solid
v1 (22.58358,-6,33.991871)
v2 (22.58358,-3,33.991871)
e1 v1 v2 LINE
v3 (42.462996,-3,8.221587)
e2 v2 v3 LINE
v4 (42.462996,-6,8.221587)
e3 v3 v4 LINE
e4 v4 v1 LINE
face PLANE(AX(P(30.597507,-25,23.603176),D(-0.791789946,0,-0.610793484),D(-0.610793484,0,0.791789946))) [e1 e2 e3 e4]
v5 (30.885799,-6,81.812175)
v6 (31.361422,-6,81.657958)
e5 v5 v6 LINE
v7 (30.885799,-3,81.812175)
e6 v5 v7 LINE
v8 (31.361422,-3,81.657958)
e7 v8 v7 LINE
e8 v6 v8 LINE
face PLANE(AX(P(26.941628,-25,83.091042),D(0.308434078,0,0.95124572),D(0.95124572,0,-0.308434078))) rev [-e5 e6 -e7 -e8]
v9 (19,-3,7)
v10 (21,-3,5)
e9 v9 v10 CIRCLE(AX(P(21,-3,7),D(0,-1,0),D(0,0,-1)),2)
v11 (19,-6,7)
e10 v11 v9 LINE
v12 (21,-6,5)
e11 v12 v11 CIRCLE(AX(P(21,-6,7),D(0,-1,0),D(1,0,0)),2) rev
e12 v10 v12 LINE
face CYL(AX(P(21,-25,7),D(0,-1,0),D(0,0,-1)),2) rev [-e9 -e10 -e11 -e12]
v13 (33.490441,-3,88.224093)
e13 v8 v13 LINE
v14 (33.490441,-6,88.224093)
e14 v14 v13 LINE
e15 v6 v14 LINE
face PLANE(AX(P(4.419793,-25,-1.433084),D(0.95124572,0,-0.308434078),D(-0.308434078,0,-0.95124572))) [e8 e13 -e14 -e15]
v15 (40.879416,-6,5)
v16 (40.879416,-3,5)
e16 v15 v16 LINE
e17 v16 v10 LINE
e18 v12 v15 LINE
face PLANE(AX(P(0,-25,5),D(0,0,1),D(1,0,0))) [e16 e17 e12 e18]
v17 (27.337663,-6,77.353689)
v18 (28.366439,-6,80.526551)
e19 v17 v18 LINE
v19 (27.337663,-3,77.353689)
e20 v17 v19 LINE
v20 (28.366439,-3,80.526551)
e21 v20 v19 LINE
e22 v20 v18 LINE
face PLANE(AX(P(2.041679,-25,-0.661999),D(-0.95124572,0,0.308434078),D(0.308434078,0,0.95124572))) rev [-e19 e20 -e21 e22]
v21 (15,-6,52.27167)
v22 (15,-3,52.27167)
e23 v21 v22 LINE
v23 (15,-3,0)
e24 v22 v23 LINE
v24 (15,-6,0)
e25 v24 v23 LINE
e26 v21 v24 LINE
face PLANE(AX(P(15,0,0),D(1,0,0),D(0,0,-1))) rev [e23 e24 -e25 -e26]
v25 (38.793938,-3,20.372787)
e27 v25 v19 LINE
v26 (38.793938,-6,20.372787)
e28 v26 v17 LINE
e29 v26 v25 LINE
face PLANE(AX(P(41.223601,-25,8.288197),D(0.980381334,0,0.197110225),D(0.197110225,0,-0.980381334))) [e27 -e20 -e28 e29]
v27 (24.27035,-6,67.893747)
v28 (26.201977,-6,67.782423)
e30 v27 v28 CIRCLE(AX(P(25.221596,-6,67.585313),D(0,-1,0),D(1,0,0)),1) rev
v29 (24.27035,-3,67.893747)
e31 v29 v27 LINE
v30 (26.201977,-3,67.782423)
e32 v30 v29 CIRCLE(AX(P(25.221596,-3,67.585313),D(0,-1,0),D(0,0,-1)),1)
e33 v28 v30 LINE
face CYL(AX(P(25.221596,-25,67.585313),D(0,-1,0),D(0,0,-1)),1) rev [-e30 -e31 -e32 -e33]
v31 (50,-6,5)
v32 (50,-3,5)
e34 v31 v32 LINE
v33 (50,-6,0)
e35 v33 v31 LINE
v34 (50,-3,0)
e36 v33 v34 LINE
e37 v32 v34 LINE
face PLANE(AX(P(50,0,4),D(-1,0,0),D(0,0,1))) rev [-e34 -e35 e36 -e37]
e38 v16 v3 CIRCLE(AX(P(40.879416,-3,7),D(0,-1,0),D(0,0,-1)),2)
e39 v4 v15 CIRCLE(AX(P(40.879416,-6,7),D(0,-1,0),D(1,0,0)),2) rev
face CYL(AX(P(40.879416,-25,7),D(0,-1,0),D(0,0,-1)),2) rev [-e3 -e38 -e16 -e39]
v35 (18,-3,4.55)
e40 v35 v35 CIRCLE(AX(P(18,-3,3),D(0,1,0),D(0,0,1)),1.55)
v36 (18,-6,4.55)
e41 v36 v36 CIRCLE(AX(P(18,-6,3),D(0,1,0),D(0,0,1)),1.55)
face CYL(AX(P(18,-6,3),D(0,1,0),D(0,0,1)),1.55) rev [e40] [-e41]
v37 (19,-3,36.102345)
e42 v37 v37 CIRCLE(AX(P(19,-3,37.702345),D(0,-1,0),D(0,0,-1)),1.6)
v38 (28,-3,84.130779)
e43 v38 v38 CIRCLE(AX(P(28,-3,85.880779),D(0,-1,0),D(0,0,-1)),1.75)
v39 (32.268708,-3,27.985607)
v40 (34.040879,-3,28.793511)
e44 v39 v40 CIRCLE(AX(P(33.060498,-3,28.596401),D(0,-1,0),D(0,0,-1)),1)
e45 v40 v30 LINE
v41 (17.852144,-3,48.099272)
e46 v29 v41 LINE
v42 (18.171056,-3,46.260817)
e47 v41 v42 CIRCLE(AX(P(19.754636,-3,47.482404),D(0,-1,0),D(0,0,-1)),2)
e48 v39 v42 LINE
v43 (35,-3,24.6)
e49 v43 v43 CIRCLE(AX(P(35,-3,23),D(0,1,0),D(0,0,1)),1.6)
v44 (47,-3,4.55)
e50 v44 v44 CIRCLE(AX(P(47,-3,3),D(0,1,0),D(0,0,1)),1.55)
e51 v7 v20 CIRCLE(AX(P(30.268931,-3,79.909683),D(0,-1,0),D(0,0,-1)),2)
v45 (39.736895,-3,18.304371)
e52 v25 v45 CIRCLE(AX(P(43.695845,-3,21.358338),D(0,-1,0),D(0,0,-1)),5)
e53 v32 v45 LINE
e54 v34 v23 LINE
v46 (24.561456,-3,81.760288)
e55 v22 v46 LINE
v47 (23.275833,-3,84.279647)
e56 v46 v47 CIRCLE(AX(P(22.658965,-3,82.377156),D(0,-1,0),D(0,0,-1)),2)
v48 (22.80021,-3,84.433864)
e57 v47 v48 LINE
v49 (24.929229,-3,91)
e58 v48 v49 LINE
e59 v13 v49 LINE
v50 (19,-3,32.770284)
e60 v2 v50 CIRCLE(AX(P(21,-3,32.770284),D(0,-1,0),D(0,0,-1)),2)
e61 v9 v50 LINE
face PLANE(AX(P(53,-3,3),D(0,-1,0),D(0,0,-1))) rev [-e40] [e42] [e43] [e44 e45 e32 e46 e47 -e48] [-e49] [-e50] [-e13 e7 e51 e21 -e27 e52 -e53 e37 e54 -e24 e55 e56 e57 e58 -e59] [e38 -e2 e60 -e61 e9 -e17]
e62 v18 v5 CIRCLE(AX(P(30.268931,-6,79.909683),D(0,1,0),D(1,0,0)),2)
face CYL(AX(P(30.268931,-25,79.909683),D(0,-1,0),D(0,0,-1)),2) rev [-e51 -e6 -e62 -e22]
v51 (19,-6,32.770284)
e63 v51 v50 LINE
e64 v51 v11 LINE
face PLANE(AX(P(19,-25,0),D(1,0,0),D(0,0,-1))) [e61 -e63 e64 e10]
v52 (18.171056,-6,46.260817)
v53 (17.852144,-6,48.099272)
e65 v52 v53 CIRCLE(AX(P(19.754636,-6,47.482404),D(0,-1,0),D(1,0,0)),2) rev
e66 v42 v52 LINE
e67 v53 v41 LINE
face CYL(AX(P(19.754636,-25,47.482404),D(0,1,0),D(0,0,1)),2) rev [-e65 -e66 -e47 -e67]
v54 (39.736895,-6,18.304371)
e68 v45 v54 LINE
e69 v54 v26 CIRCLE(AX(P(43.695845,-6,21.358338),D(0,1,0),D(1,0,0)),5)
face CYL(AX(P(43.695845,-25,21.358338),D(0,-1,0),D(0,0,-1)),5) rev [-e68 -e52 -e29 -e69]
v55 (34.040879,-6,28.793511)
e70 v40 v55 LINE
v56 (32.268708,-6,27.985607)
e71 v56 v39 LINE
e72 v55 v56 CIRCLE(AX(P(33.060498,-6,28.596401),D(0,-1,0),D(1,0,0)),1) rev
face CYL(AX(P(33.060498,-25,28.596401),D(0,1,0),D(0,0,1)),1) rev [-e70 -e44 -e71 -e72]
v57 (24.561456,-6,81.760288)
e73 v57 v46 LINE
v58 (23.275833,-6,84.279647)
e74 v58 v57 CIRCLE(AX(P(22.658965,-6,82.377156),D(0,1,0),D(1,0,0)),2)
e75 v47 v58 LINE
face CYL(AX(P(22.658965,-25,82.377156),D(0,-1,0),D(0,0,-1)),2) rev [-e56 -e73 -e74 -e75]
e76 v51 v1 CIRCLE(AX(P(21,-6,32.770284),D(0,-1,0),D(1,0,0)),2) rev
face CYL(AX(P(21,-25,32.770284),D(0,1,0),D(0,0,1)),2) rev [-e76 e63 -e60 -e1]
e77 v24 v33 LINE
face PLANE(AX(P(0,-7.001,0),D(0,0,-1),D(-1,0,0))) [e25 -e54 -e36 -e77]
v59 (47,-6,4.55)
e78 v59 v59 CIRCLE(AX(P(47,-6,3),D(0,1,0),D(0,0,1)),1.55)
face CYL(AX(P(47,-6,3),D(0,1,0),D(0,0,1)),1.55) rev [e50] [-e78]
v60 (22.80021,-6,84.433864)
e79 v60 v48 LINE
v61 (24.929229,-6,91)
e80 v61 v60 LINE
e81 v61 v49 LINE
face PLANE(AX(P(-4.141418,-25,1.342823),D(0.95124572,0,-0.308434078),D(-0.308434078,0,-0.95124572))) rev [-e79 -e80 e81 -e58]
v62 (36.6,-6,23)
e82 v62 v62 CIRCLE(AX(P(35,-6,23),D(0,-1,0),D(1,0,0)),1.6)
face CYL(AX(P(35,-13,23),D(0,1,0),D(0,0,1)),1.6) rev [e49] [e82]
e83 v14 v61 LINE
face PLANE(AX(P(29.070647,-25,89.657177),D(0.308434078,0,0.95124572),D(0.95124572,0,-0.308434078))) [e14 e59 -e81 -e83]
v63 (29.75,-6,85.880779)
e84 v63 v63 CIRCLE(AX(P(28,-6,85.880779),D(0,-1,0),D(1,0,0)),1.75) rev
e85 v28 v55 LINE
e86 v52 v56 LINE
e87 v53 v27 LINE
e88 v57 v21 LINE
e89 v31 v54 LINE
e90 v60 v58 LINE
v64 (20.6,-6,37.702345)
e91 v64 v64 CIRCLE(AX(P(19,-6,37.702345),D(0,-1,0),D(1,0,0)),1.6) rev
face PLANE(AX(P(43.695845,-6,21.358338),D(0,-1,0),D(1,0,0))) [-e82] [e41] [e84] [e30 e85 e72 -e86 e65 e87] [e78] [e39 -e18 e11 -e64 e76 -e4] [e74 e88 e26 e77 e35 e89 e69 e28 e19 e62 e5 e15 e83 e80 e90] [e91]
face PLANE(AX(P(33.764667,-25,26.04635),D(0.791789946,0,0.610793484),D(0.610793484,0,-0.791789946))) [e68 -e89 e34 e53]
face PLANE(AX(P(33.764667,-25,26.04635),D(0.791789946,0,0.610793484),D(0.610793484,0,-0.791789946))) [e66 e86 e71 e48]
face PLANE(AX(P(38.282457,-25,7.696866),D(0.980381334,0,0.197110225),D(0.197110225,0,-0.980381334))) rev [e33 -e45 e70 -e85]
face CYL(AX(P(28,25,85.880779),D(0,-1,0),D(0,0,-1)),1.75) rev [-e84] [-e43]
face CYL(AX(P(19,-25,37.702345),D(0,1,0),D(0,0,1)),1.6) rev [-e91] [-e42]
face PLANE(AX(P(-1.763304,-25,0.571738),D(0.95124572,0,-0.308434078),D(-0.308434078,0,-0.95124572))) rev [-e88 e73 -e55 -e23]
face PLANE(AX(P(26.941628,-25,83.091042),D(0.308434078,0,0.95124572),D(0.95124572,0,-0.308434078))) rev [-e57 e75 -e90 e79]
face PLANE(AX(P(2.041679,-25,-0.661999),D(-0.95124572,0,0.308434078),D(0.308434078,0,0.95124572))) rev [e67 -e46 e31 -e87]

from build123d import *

# Parameters (mm, degrees)
EXTRUDE_1_DEPTH      = 4
EXTRUDE_1_DEPTH_BACK = 3
SKETCH_1_W           = 100
SKETCH_1_H           = 14
SKETCH_1_R           = 1.75
SKETCH_2_W           = 88
SKETCH_2_H           = 14
EXTRUDE_2_DEPTH      = 3
SKETCH_10_W          = 88
SKETCH_10_H          = 4
EXTRUDE_5_DEPTH      = 35
SKETCH_11_R          = 1.6
CUT_EXTRUDE_3_DEPTH  = 25
SKETCH_19_W          = 65
SKETCH_19_H          = 14
CUT_EXTRUDE_7_DEPTH  = 10
SKETCH_21_R          = 1.75
CUT_EXTRUDE_9_DEPTH  = 25
FILLET_3_R           = 2
FILLET_4_R           = 1
FILLET_5_R           = 5
CUT_EXTRUDE_14_REACH = 106.771
SKETCH_27_W          = 35
SKETCH_27_H          = 3
SKETCH_28_W          = 56.249176637
SKETCH_28_H          = 109.102130605
CUT_EXTRUDE_15_DEPTH = 10
CUT_EXTRUDE_16_DEPTH = 1
SKETCH_34_R          = 1.55
CUT_EXTRUDE_17_DEPTH = 104.874924789
SKETCH_35_R          = 1.6
CUT_EXTRUDE_18_DEPTH = 10


with BuildPart() as part:
    # 草图1 → 凸台-拉伸1 (new, two sides: drawn at the far end of the back side and taken through both)
    # profile 1 of 3: a face of its own
    with BuildSketch(Plane.XY.offset(-EXTRUDE_1_DEPTH_BACK)):
        Rectangle(SKETCH_1_W, SKETCH_1_H)
        with Locations((26.315, 2.5)):
            Circle(SKETCH_1_R, mode=Mode.SUBTRACT)
        with Locations((26.315, -2.5)):
            Circle(SKETCH_1_R, mode=Mode.SUBTRACT)
        with Locations((-26.315, -2.5)):
            Circle(SKETCH_1_R, mode=Mode.SUBTRACT)
        with Locations((-26.315, 2.5)):
            Circle(SKETCH_1_R, mode=Mode.SUBTRACT)
    # profile 2 of 3: a face of its own
    with BuildSketch(Plane.XY.offset(-EXTRUDE_1_DEPTH_BACK)):
        with Locations((-26.315, -2.5)):
            Circle(SKETCH_1_R)
    # profile 3 of 3: a face of its own
    with BuildSketch(Plane.XY.offset(-EXTRUDE_1_DEPTH_BACK)):
        with Locations((26.315, -2.5)):
            Circle(SKETCH_1_R)
    extrude(amount=EXTRUDE_1_DEPTH + EXTRUDE_1_DEPTH_BACK)

    # 草图2 → 凸台-拉伸2 (add)
    with BuildSketch(Plane(origin=(15, 0, 0), x_dir=(0, 0, -1), z_dir=(1, 0, 0))):
        with Locations((-47, 0)):
            Rectangle(SKETCH_2_W, SKETCH_2_H)
    extrude(amount=EXTRUDE_2_DEPTH)

    # 草图10 → 凸台-拉伸5 (add)
    with BuildSketch(Plane(origin=(18, 0, 0), x_dir=(0, 0, -1), z_dir=(1, 0, 0))):
        with Locations((-47, -5)):
            Rectangle(SKETCH_10_W, SKETCH_10_H)
        with Locations((-47, 5)):
            Rectangle(SKETCH_10_W, SKETCH_10_H)
    extrude(amount=EXTRUDE_5_DEPTH)

    # 草图11 → 切除-拉伸3 (cut, symmetric)
    with BuildSketch(Plane(origin=(0, 0, 0), x_dir=(1, 0, 0), z_dir=(0, 1, 0))):
        Polygon((39.023998465, -19.228520587), (27.337663153, -77.353689014), (28.983307446, -82.429042884), (31.361421746, -81.657957689), (33.490440504, -88.2240933), (24.929229025, -91), (53, -91), (53, 0), (50, 0), (50, -5), align=None)
        Polygon((15, -91), (24.929229025, -91), (22.800210266, -84.433864389), (25.178324566, -83.662779195), (15, -52.271670437), align=None)
        Polygon((34.885276375, -24.593670389), (17.526825547, -47.095951771), (25.448841284, -71.528347887), align=None)
        with BuildLine():
            Line((19, -5), (19, -32.770283869))
            ThreePointArc((19, -32.770283869), (20.354693788, -34.663318442), (22.583579893, -33.991870838))
            Line((22.583579893, -33.991870838), (44.948155104, -5))
            Line((44.948155104, -5), (19, -5))
        make_face()
        with Locations((19, -37.702345436)):
            Circle(SKETCH_11_R)
    extrude(amount=CUT_EXTRUDE_3_DEPTH, both=True, mode=Mode.SUBTRACT)

    # 草图19 → 切除-拉伸7 (cut)
    with BuildSketch(Plane.XY.offset(4)):
        with Locations((-17.5, 0)):
            Rectangle(SKETCH_19_W, SKETCH_19_H)
    extrude(amount=-CUT_EXTRUDE_7_DEPTH, mode=Mode.SUBTRACT)

    # 草图21 → 切除-拉伸9 (cut, symmetric)
    with BuildSketch(Plane(origin=(0, 0, 0.28540368), x_dir=(1, 0, 0), z_dir=(0, -1, 0))):
        with Locations((28, 85.595375174)):
            Circle(SKETCH_21_R)
    extrude(amount=CUT_EXTRUDE_9_DEPTH, both=True, mode=Mode.SUBTRACT)

    # 圆角3
    # the kernel refuses this fillet: 2 mm, written as the material it adds along each edge
    with BuildSketch(Plane(origin=(25.178324566, 7, 83.662779195), x_dir=(-0.3084340777609257, 0, -0.9512457199250713), z_dir=(0, -1, 0)), Plane(origin=(25.178324566, -3, 83.662779195), x_dir=(-0.3084340777609257, 0, -0.9512457199250713), z_dir=(0, -1, 0)), Plane(origin=(19, 7, 5), x_dir=(0, 0, 1), z_dir=(0, -1, 0)), Plane(origin=(19, -3, 5), x_dir=(0, 0, 1), z_dir=(0, -1, 0)), Plane(origin=(28.983307446, 3, 82.429042884), x_dir=(-0.30843407776092724, 0, -0.9512457199250708), z_dir=(0, 1, 0)), Plane(origin=(28.983307446, -7, 82.429042884), x_dir=(-0.30843407776092724, 0, -0.9512457199250708), z_dir=(0, 1, 0))) as fillet_3_piece_1:
        with BuildLine():
            CenterArc((FILLET_3_R, -FILLET_3_R), FILLET_3_R, 90, 90)
            Line((0, -FILLET_3_R), (0, 0))
            Line((0, 0), (FILLET_3_R, 0))
        make_face()
    extrude(amount=4)
    with BuildSketch(Plane(origin=(17.526825547, -7, 47.095951771), x_dir=(0.6107934844398675, 0, -0.7917899464920006), z_dir=(0, 1, 0))) as fillet_3_piece_2_section:
        with BuildLine():
            CenterArc((FILLET_3_R * 0.527371630949, -FILLET_3_R), FILLET_3_R, 90, 55.611785257)
            Line((-FILLET_3_R * 0.297858058809, -FILLET_3_R * 0.435202727395), (0, 0))
            Line((0, 0), (FILLET_3_R * 0.527371630949, 0))
        make_face()
    fillet_3_piece_2 = extrude(amount=14, mode=Mode.PRIVATE)
    fillet_3_piece_2 = split(fillet_3_piece_2, bisect_by=Plane(origin=(18.071498968, -3, 46.365808537), z_dir=(0, -1, 0)), keep=Keep.TOP, mode=Mode.PRIVATE)
    fillet_3_piece_2 = split(fillet_3_piece_2, bisect_by=Plane(origin=(18, -5, 46.365808537), z_dir=(1, 0, 0)), keep=Keep.TOP, mode=Mode.PRIVATE)
    add(fillet_3_piece_2)
    with BuildSketch(Plane(origin=(17.526825547, -7, 47.095951771), x_dir=(0.6107934844398675, 0, -0.7917899464920006), z_dir=(0, 1, 0))) as fillet_3_piece_3_section:
        with BuildLine():
            CenterArc((FILLET_3_R * 0.527371630949, -FILLET_3_R), FILLET_3_R, 90, 55.611785257)
            Line((-FILLET_3_R * 0.297858058809, -FILLET_3_R * 0.435202727395), (0, 0))
            Line((0, 0), (FILLET_3_R * 0.527371630949, 0))
        make_face()
    fillet_3_piece_3 = extrude(amount=14, mode=Mode.PRIVATE)
    fillet_3_piece_3 = split(fillet_3_piece_3, bisect_by=Plane(origin=(17.718589795, -3, 47.171312239), z_dir=(0, -1, 0)), keep=Keep.TOP, mode=Mode.PRIVATE)
    fillet_3_piece_3 = split(fillet_3_piece_3, bisect_by=Plane(origin=(18, -5, 47.171312239), z_dir=(-1, 0, 0)), keep=Keep.TOP, mode=Mode.PRIVATE)
    add(fillet_3_piece_3)
    with BuildSketch(Plane(origin=(17.526825547, -7, 47.095951771), x_dir=(0.6107934844398675, 0, -0.7917899464920006), z_dir=(0, 1, 0))) as fillet_3_piece_4_section:
        with BuildLine():
            CenterArc((FILLET_3_R * 0.527371630949, -FILLET_3_R), FILLET_3_R, 90, 55.611785257)
            Line((-FILLET_3_R * 0.297858058809, -FILLET_3_R * 0.435202727395), (0, 0))
            Line((0, 0), (FILLET_3_R * 0.527371630949, 0))
        make_face()
    fillet_3_piece_4 = extrude(amount=14, mode=Mode.PRIVATE)
    fillet_3_piece_4 = split(fillet_3_piece_4, bisect_by=Plane(origin=(17.718589795, -3, 47.171312239), z_dir=(0, 1, 0)), keep=Keep.TOP, mode=Mode.PRIVATE)
    fillet_3_piece_4 = split(fillet_3_piece_4, bisect_by=Plane(origin=(18, 0, 47.171312239), z_dir=(-1, 0, 0)), keep=Keep.TOP, mode=Mode.PRIVATE)
    fillet_3_piece_4 = split(fillet_3_piece_4, bisect_by=Plane(origin=(17.718589795, 3, 47.171312239), z_dir=(0, -1, 0)), keep=Keep.TOP, mode=Mode.PRIVATE)
    add(fillet_3_piece_4)
    with BuildSketch(Plane(origin=(17.526825547, -7, 47.095951771), x_dir=(0.6107934844398675, 0, -0.7917899464920006), z_dir=(0, 1, 0))) as fillet_3_piece_5_section:
        with BuildLine():
            CenterArc((FILLET_3_R * 0.527371630949, -FILLET_3_R), FILLET_3_R, 90, 55.611785257)
            Line((-FILLET_3_R * 0.297858058809, -FILLET_3_R * 0.435202727395), (0, 0))
            Line((0, 0), (FILLET_3_R * 0.527371630949, 0))
        make_face()
    fillet_3_piece_5 = extrude(amount=14, mode=Mode.PRIVATE)
    fillet_3_piece_5 = split(fillet_3_piece_5, bisect_by=Plane(origin=(18, 5, 46.365808537), z_dir=(1, 0, 0)), keep=Keep.TOP, mode=Mode.PRIVATE)
    fillet_3_piece_5 = split(fillet_3_piece_5, bisect_by=Plane(origin=(18.071498968, 3, 46.365808537), z_dir=(0, 1, 0)), keep=Keep.TOP, mode=Mode.PRIVATE)
    add(fillet_3_piece_5)
    with BuildSketch(Plane(origin=(17.526825547, -7, 47.095951771), x_dir=(0.6107934844398675, 0, -0.7917899464920006), z_dir=(0, 1, 0))) as fillet_3_piece_6_section:
        with BuildLine():
            CenterArc((FILLET_3_R * 0.527371630949, -FILLET_3_R), FILLET_3_R, 90, 55.611785257)
            Line((-FILLET_3_R * 0.297858058809, -FILLET_3_R * 0.435202727395), (0, 0))
            Line((0, 0), (FILLET_3_R * 0.527371630949, 0))
        make_face()
    fillet_3_piece_6 = extrude(amount=14, mode=Mode.PRIVATE)
    fillet_3_piece_6 = split(fillet_3_piece_6, bisect_by=Plane(origin=(18, 5, 47.171312239), z_dir=(-1, 0, 0)), keep=Keep.TOP, mode=Mode.PRIVATE)
    fillet_3_piece_6 = split(fillet_3_piece_6, bisect_by=Plane(origin=(17.718589795, 3, 47.171312239), z_dir=(0, 1, 0)), keep=Keep.TOP, mode=Mode.PRIVATE)
    add(fillet_3_piece_6)
    with BuildSketch(Plane(origin=(44.948155104, 7.171848554, 5), x_dir=(-1, 0, 0), z_dir=(0, -1, 0))) as fillet_3_piece_7_section:
        with BuildLine():
            CenterArc((FILLET_3_R * 2.03436971078, -FILLET_3_R), FILLET_3_R, 90, 127.646899195)
            Line((FILLET_3_R * 1.24257976428, -FILLET_3_R * 1.61079348444), (0, 0))
            Line((0, 0), (FILLET_3_R * 2.03436971078, 0))
        make_face()
    fillet_3_piece_7 = extrude(amount=14.171848554, mode=Mode.PRIVATE)
    fillet_3_piece_7 = split(fillet_3_piece_7, bisect_by=Plane(origin=(43.295874914, 7, 5.81218285), z_dir=(0, -1, 0)), keep=Keep.TOP, mode=Mode.PRIVATE)
    fillet_3_piece_7 = split(fillet_3_piece_7, bisect_by=Plane(origin=(43.295874914, 3, 5.81218285), z_dir=(0, 1, 0)), keep=Keep.TOP, mode=Mode.PRIVATE)
    add(fillet_3_piece_7)
    with BuildSketch(Plane(origin=(44.948155104, -3, 5), x_dir=(-1, 0, 0), z_dir=(0, -1, 0)), Plane(origin=(44.948155104, 7, 5), x_dir=(-1, 0, 0), z_dir=(0, -1, 0))) as fillet_3_piece_8:
        with BuildLine():
            CenterArc((FILLET_3_R * 2.03436971078, -FILLET_3_R), FILLET_3_R, 90, 127.646899195)
            Line((FILLET_3_R * 1.24257976428, -FILLET_3_R * 1.61079348444), (0, 0))
            Line((0, 0), (FILLET_3_R * 2.03436971078, 0))
        make_face()
    extrude(amount=4)
    with BuildSketch(Plane(origin=(44.948155104, 7, 5), x_dir=(-1, 0, 0), z_dir=(0, -1, 0))) as fillet_3_piece_9_section:
        with BuildLine():
            CenterArc((FILLET_3_R * 2.03436971078, -FILLET_3_R), FILLET_3_R, 90, 127.646899195)
            Line((FILLET_3_R * 1.24257976428, -FILLET_3_R * 1.61079348444), (0, 0))
            Line((0, 0), (FILLET_3_R * 2.03436971078, 0))
        make_face()
    fillet_3_piece_9 = extrude(amount=14.171848554, mode=Mode.PRIVATE)
    fillet_3_piece_9 = split(fillet_3_piece_9, bisect_by=Plane(origin=(43.295874914, -7, 5.81218285), z_dir=(0, 1, 0)), keep=Keep.TOP, mode=Mode.PRIVATE)
    fillet_3_piece_9 = split(fillet_3_piece_9, bisect_by=Plane(origin=(43.295874914, -3, 5.81218285), z_dir=(0, -1, 0)), keep=Keep.TOP, mode=Mode.PRIVATE)
    add(fillet_3_piece_9)

    # 圆角4
    fillet_4_edges = [part.edges().sort_by_distance(p)[0] for p in [
        (34.885276375, 5, 24.593670389),
        (34.885276375, -5, 24.593670389),
        (25.448841284, -5, 71.528347887),
        (25.448841284, 5, 71.528347887),
    ]]
    fillet(fillet_4_edges, radius=FILLET_4_R)

    # 圆角5
    fillet_5_edges = [part.edges().sort_by_distance(p)[0] for p in [
        (39.023998465, 5, 19.228520587),
        (39.023998465, -5, 19.228520587),
    ]]
    fillet(fillet_5_edges, radius=FILLET_5_R)

    # 草图27 → 切除-拉伸14 (cut, up to next)
    with BuildSketch(Plane(origin=(0, 7, 0), x_dir=(1, 0, 0), z_dir=(0, 1, 0)), mode=Mode.PRIVATE) as cut_extrude_14_sk1:
        with Locations((32.5, 1.5)):
            Rectangle(SKETCH_27_W, SKETCH_27_H)
    cut_extrude_14_tool1 = extrude(cut_extrude_14_sk1.sketch, amount=-CUT_EXTRUDE_14_REACH, mode=Mode.PRIVATE) & part.part
    add(cut_extrude_14_tool1.solids().sort_by_distance((32.5, 7, -1.5))[0], mode=Mode.SUBTRACT)

    # 草图28 → 切除-拉伸15 (cut)
    with BuildSketch(Plane(origin=(0, 7, 0), x_dir=(1, 0, 0), z_dir=(0, 1, 0))):
        with Locations((28.124588319, -46.75205982)):
            Rectangle(SKETCH_28_W, SKETCH_28_H)
    extrude(amount=-CUT_EXTRUDE_15_DEPTH, mode=Mode.SUBTRACT)

    # 草图33 → 切除-拉伸16 (cut)
    with BuildSketch(Plane.XZ.offset(7)):
        with BuildLine():
            Line((15, 52.271670437), (15, 0))
            Line((15, 0), (50, 0))
            Line((50, 0), (50, 5))
            Line((50, 5), (39.736895245, 18.304371071))
            ThreePointArc((39.736895245, 18.304371071), (39.146308678, 19.2842798), (38.793938309, 20.372787371))
            Line((38.793938309, 20.372787371), (27.337663153, 77.353689014))
            Line((27.337663153, 77.353689014), (28.36643929, 80.526551444))
            ThreePointArc((28.36643929, 80.526551444), (29.359857788, 81.691139542), (30.885798886, 81.812174728))
            Line((30.885798886, 81.812174728), (31.361421746, 81.657957689))
            Line((31.361421746, 81.657957689), (33.490440504, 88.2240933))
            Line((33.490440504, 88.2240933), (24.929229025, 91))
            Line((24.929229025, 91), (22.800210266, 84.433864389))
            Line((22.800210266, 84.433864389), (23.275833126, 84.27964735))
            ThreePointArc((23.275833126, 84.27964735), (24.440421225, 83.286228853), (24.561456411, 81.760287755))
            Line((24.561456411, 81.760287755), (15, 52.271670437))
        make_face()
    extrude(amount=-CUT_EXTRUDE_16_DEPTH, mode=Mode.SUBTRACT)

    # 草图34 → 切除-拉伸17 (cut, through all)
    with BuildSketch(Plane(origin=(0, -3, 0), x_dir=(1, 0, 0), z_dir=(0, 1, 0))):
        with Locations(Location((18, -3, 0), (0, 0, 270))):
            Circle(SKETCH_34_R)
        with Locations(Location((47, -3, 0), (0, 0, 270))):
            Circle(SKETCH_34_R)
    extrude(amount=-CUT_EXTRUDE_17_DEPTH, mode=Mode.SUBTRACT)

    # 草图35 → 切除-拉伸18 (cut)
    with BuildSketch(Plane(origin=(0, -3, 0), x_dir=(1, 0, 0), z_dir=(0, 1, 0))):
        with Locations(Location((35, -23, 0), (0, 0, 270))):
            Circle(SKETCH_35_R)
    extrude(amount=-CUT_EXTRUDE_18_DEPTH, mode=Mode.SUBTRACT)


solid = part.part
